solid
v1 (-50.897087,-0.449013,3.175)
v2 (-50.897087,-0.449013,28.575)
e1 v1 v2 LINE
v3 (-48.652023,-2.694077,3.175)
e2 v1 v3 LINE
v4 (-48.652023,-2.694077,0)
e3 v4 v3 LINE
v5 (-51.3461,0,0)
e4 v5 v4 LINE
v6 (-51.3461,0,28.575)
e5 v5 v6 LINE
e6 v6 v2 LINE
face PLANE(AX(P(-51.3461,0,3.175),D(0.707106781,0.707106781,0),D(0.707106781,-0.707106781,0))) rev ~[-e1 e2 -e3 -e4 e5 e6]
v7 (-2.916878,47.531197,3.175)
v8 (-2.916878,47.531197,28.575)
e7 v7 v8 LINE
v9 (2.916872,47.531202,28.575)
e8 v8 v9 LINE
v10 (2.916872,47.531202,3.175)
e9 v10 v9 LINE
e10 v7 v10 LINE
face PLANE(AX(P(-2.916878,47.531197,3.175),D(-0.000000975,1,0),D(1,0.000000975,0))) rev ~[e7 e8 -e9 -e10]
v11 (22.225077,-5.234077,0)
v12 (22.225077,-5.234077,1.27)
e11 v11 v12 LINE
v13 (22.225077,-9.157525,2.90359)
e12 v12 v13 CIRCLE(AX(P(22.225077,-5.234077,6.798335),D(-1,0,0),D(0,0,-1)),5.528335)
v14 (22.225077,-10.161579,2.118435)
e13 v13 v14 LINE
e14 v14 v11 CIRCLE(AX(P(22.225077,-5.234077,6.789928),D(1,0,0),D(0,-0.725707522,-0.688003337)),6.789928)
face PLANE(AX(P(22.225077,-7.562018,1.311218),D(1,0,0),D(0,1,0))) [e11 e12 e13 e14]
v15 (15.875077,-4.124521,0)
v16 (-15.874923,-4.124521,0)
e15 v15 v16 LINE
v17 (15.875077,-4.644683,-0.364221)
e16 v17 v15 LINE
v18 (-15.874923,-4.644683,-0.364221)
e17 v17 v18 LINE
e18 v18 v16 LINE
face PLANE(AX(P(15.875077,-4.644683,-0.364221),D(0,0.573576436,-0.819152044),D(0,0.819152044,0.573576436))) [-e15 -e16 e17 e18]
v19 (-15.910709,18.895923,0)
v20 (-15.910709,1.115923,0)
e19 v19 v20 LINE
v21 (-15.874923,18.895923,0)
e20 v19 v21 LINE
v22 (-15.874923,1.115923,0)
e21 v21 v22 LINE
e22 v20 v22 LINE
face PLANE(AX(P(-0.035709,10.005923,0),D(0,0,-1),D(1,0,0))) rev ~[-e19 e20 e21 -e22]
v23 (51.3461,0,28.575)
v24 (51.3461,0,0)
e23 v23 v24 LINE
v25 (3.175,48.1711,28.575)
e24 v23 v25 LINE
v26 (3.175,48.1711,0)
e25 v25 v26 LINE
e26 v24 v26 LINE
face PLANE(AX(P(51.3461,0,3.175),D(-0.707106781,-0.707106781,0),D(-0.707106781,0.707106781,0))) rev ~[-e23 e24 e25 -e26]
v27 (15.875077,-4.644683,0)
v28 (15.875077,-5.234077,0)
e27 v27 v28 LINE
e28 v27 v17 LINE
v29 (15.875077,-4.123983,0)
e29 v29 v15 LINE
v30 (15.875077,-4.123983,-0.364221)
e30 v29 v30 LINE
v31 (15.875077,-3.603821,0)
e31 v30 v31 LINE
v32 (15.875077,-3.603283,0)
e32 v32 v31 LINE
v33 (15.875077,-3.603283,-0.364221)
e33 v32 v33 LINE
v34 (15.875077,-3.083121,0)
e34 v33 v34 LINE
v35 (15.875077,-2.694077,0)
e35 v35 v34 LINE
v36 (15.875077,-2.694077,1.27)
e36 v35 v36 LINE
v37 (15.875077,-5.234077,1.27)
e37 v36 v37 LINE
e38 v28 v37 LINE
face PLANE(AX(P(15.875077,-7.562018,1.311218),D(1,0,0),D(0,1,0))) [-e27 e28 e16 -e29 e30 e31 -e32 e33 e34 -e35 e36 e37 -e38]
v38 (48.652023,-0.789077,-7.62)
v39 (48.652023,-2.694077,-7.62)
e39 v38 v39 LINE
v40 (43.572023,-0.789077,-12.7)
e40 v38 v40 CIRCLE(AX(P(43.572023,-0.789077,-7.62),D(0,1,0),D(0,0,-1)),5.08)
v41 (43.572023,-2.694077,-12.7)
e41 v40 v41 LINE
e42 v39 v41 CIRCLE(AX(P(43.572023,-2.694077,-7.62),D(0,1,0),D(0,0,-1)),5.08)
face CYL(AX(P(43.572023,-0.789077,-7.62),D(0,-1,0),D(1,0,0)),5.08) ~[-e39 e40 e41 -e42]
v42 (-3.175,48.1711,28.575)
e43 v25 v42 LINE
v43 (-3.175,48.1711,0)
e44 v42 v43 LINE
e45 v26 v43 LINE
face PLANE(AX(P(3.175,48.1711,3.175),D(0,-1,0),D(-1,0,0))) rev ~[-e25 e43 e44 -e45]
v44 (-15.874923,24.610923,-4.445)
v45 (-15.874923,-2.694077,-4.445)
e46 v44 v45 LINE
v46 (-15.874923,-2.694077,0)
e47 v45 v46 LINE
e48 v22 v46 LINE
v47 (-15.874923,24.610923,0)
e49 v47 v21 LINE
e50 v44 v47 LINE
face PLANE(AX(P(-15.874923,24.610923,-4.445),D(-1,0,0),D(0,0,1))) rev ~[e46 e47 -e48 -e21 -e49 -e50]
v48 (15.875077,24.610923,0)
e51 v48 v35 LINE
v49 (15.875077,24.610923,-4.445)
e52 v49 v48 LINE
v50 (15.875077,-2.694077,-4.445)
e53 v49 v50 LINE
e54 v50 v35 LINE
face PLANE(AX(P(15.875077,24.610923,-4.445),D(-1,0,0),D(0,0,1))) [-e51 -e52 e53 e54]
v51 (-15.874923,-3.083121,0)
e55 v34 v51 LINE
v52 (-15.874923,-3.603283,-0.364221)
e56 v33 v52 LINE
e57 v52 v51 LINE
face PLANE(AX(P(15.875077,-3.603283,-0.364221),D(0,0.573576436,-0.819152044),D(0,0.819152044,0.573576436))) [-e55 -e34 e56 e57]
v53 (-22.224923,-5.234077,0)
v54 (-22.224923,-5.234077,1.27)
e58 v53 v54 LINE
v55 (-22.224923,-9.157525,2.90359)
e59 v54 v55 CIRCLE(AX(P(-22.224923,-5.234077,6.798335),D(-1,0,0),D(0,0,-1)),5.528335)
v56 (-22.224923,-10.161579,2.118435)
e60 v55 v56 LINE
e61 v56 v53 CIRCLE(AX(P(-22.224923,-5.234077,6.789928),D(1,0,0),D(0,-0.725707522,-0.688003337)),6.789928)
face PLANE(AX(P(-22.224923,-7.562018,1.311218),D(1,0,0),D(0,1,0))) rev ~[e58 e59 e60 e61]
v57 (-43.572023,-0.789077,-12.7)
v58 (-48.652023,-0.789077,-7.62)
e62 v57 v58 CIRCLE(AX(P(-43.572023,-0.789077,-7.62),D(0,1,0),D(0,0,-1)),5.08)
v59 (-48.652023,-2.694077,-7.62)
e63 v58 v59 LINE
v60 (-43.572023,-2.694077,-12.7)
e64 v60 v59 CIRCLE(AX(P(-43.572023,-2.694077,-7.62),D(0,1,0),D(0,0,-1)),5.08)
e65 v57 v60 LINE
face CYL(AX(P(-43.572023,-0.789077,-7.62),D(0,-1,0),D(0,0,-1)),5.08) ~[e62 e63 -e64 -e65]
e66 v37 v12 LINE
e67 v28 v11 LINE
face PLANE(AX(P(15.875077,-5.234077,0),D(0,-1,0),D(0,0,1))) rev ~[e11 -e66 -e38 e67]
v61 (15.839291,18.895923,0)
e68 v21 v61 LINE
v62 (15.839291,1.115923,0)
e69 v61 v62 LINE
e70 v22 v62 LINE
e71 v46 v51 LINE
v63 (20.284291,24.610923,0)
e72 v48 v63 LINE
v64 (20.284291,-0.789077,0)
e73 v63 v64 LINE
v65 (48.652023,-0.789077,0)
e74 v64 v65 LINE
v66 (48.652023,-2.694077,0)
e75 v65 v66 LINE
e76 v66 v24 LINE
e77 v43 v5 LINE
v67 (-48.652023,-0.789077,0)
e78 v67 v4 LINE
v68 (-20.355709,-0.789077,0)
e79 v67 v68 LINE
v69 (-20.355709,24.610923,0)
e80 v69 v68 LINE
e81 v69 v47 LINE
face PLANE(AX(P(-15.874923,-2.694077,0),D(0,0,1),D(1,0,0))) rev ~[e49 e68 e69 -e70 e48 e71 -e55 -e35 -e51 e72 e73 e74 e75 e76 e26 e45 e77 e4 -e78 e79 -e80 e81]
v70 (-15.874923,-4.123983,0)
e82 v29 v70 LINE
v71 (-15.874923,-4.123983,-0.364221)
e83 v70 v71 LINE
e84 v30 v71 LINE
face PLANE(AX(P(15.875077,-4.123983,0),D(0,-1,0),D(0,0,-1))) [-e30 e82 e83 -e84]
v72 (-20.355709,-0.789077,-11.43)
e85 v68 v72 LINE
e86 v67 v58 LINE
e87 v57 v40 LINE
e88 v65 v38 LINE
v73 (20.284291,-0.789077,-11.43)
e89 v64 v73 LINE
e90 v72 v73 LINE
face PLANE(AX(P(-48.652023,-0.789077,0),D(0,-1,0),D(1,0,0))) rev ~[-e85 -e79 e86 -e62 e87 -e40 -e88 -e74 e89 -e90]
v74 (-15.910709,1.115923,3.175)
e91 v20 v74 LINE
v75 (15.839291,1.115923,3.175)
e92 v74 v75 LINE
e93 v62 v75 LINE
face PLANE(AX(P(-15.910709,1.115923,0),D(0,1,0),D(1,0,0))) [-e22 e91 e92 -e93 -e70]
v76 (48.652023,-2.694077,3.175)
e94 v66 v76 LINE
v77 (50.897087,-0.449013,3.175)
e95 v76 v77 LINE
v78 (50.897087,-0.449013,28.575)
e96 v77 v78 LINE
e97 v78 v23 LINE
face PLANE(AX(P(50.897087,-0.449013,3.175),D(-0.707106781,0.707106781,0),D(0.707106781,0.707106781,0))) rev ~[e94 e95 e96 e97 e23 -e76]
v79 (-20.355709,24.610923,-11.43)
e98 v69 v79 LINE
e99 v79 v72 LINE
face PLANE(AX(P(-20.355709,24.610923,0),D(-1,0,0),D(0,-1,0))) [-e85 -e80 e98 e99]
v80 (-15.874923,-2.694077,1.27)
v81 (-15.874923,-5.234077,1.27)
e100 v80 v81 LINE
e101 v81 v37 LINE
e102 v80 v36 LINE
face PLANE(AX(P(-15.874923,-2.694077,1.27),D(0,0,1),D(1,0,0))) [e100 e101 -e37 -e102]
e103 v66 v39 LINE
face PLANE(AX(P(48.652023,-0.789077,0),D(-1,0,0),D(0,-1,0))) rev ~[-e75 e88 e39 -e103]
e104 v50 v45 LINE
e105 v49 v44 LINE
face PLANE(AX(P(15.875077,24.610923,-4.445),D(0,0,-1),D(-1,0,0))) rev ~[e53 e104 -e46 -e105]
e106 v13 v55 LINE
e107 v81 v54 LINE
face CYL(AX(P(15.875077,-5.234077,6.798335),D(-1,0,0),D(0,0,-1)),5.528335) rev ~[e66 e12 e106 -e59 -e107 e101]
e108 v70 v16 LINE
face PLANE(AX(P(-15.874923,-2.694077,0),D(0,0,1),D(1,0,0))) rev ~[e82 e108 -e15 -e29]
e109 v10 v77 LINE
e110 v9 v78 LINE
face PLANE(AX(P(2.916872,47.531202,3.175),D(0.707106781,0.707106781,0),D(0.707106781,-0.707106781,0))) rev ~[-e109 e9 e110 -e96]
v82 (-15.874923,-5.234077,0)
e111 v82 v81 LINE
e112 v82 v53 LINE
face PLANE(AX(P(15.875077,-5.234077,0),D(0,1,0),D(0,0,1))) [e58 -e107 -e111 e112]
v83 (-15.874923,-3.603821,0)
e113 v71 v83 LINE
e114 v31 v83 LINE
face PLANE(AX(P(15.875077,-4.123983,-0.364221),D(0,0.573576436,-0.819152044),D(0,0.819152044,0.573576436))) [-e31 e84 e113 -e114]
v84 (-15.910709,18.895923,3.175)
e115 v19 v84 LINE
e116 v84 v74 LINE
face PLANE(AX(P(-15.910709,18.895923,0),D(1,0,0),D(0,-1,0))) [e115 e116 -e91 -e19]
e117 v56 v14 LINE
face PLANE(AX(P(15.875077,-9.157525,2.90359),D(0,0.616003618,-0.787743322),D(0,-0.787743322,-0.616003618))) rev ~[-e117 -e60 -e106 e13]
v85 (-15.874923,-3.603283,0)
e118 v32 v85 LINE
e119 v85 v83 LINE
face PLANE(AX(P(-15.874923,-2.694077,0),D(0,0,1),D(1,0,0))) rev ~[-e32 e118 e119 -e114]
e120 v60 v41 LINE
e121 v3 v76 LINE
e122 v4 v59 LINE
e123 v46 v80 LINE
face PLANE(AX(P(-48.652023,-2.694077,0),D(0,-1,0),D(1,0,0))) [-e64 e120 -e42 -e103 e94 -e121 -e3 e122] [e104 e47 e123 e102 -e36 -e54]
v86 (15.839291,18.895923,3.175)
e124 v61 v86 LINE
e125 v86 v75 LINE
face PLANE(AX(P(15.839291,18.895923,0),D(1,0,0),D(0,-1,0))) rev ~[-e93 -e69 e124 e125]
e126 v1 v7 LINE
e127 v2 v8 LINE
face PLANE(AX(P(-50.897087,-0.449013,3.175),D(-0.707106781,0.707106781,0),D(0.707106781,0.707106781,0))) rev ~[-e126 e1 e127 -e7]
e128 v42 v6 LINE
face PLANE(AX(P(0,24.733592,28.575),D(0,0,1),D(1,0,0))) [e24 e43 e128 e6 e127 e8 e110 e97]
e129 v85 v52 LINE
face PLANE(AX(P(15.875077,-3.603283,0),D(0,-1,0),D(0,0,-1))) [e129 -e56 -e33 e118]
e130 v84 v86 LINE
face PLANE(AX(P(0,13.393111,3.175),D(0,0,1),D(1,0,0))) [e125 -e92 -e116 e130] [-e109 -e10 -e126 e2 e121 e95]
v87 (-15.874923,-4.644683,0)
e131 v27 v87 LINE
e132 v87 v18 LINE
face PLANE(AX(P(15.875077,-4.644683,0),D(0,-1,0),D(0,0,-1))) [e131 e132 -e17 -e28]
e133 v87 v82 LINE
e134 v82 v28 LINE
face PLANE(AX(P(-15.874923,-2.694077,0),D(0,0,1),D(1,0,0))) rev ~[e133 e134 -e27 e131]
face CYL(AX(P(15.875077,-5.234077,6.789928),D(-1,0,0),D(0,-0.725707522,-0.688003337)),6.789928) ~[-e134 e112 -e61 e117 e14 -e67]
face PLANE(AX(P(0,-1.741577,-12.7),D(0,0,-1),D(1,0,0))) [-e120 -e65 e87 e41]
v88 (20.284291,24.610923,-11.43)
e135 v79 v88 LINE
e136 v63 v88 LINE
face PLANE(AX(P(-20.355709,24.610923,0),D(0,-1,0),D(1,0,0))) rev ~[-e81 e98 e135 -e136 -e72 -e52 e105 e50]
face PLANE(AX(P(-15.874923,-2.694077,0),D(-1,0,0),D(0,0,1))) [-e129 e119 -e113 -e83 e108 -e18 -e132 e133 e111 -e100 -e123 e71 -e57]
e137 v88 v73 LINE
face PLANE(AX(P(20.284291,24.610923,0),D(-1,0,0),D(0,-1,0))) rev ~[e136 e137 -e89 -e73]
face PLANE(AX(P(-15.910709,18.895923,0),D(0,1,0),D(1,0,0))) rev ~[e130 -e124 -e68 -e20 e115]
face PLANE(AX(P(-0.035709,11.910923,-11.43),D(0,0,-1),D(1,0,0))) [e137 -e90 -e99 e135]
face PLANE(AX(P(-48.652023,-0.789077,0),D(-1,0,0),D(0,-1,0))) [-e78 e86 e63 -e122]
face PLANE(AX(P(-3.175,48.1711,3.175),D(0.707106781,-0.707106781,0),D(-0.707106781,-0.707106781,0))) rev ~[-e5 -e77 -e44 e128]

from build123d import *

# Parameters (mm, degrees)
F1_DEPTH         = 3.175
F3_DEPTH         = 25.4
F4_W             = 97.3040463274
F4_H             = 1.905
F5_DEPTH         = 12.7
F6_W             = 40.64
F6_H             = 25.4
F7_DEPTH         = 11.43
F8_W             = 31.75
F8_H             = 17.78
F9_DEPTH         = 3.175
F10_W            = 31.75
F10_H            = 4.445
F11_DEPTH        = 27.305
F12_W            = 31.75
F12_H            = 1.27
F13_DEPTH        = 2.54
F15_DEPTH        = 31.75
F15_COPIES_COUNT = 3
F15_COPIES_PITCH = 0.5207
F17_DEPTH        = 38.1
F18_DEPTH        = 6.35
F19_R            = 5.08


# Not quite as in the source:
# - a pattern or mirror of a feature is missing from the dataset's text; its kind, count and spacing are read off the source's solid


with BuildPart() as f1:
    # F0 (on Top) → F1 (new body)
    with BuildSketch(Plane.XY):
        Polygon((3.175, 48.1711), (-3.175, 48.1711), (-51.3461, 0), (-48.6520231637, -2.6940768363), (48.6520231637, -2.6940768363), (51.3461, 0), align=None)
    extrude(amount=F1_DEPTH)

    # F2 (on face) → F3 (join)
    with BuildSketch(Plane.XY.offset(3.175)):
        Polygon((-3.175, 48.1711), (-51.3461, 0), (-50.8970871939, -0.4490128061), (-2.916877582, 47.5311968059), (2.916871896, 47.5312024919), (50.8970871939, -0.4490128061), (51.3461, 0), (3.175, 48.1711), align=None)
    extrude(amount=F3_DEPTH)

    # F4 (on face) → F5 (join)
    with BuildSketch(Plane(origin=(0, 0, 0), x_dir=(1, 0, 0), z_dir=(0, 0, -1))):
        with Locations((0, 1.7415768363)):
            Rectangle(F4_W, F4_H)
    extrude(amount=F5_DEPTH)

    # F6 (on face) → F7 (join)
    with BuildSketch(Plane(origin=(0, 0, 0), x_dir=(1, 0, 0), z_dir=(0, 0, -1))):
        with Locations((-0.0357092768, -11.9109231637)):
            Rectangle(F6_W, F6_H)
    extrude(amount=F7_DEPTH)

    # F8 (on face) → F9 (cut, through all)
    with BuildSketch(Plane(origin=(0, 0, 0), x_dir=(1, 0, 0), z_dir=(0, 0, -1))):
        with Locations((-0.0357092768, -10.0059231637)):
            Rectangle(F8_W, F8_H)
    extrude(amount=-F9_DEPTH, mode=Mode.SUBTRACT)

    # F10 (on face) → F11 (cut, through all)
    with BuildSketch(Plane(origin=(0, 24.6109231637, 0), x_dir=(-1, 0, 0), z_dir=(0, 1, 0))):
        with Locations((-7.74733e-05, -2.2225)):
            Rectangle(F10_W, F10_H)
    extrude(amount=-F11_DEPTH, mode=Mode.SUBTRACT)

    # F12 (on face) → F13 (join)
    with BuildSketch(Plane.XZ.offset(2.6940768363)):
        with Locations((7.74733e-05, 0.635)):
            Rectangle(F12_W, F12_H)
    extrude(amount=F13_DEPTH)

    # F14 (on face) → F15 (join, through all)
    with BuildSketch(Plane.YZ.offset(15.8750774733)):
        Polygon((-3.6032828125, -0.3642210371), (-3.0831212644, 0), (-3.6032828125, 0), align=None)
    f15 = extrude(amount=-F15_DEPTH)

    # F15_copies: F15 ×3
    with Locations(*[(0, -i * F15_COPIES_PITCH, 0) for i in range(1, F15_COPIES_COUNT)]):
        add(f15)

    # F16 (on face) → F17 (join)
    with BuildSketch(Plane.YZ.offset(15.8750774733)):
        with BuildLine():
            Line((-9.1575253509, 2.9035897025), (-10.161578661, 2.1184348754))
            ThreePointArc((-10.161578661, 2.1184348754), (-7.9158691733, 0.5520507884), (-5.2340768363, 0))
            Line((-5.2340768363, 0), (-5.2340768363, 1.27))
            ThreePointArc((-5.2340768363, 1.27), (-7.3590511634, 1.6947115498), (-9.1575253509, 2.9035897025))
        make_face()
    extrude(amount=-F17_DEPTH)

    # F16 (on face) → F18 (join)
    with BuildSketch(Plane.YZ.offset(15.8750774733)):
        with BuildLine():
            Line((-9.1575253509, 2.9035897025), (-10.161578661, 2.1184348754))
            ThreePointArc((-10.161578661, 2.1184348754), (-7.9158691733, 0.5520507884), (-5.2340768363, 0))
            Line((-5.2340768363, 0), (-5.2340768363, 1.27))
            ThreePointArc((-5.2340768363, 1.27), (-7.3590511634, 1.6947115498), (-9.1575253509, 2.9035897025))
        make_face()
    extrude(amount=F18_DEPTH)

    # F19
    f19_edges = [f1.edges().sort_by_distance(p)[0] for p in [
        (-48.652023, -1.741577, -12.7),
        (48.652023, -1.741577, -12.7),
    ]]
    fillet(f19_edges, radius=F19_R)


solid = f1.part
